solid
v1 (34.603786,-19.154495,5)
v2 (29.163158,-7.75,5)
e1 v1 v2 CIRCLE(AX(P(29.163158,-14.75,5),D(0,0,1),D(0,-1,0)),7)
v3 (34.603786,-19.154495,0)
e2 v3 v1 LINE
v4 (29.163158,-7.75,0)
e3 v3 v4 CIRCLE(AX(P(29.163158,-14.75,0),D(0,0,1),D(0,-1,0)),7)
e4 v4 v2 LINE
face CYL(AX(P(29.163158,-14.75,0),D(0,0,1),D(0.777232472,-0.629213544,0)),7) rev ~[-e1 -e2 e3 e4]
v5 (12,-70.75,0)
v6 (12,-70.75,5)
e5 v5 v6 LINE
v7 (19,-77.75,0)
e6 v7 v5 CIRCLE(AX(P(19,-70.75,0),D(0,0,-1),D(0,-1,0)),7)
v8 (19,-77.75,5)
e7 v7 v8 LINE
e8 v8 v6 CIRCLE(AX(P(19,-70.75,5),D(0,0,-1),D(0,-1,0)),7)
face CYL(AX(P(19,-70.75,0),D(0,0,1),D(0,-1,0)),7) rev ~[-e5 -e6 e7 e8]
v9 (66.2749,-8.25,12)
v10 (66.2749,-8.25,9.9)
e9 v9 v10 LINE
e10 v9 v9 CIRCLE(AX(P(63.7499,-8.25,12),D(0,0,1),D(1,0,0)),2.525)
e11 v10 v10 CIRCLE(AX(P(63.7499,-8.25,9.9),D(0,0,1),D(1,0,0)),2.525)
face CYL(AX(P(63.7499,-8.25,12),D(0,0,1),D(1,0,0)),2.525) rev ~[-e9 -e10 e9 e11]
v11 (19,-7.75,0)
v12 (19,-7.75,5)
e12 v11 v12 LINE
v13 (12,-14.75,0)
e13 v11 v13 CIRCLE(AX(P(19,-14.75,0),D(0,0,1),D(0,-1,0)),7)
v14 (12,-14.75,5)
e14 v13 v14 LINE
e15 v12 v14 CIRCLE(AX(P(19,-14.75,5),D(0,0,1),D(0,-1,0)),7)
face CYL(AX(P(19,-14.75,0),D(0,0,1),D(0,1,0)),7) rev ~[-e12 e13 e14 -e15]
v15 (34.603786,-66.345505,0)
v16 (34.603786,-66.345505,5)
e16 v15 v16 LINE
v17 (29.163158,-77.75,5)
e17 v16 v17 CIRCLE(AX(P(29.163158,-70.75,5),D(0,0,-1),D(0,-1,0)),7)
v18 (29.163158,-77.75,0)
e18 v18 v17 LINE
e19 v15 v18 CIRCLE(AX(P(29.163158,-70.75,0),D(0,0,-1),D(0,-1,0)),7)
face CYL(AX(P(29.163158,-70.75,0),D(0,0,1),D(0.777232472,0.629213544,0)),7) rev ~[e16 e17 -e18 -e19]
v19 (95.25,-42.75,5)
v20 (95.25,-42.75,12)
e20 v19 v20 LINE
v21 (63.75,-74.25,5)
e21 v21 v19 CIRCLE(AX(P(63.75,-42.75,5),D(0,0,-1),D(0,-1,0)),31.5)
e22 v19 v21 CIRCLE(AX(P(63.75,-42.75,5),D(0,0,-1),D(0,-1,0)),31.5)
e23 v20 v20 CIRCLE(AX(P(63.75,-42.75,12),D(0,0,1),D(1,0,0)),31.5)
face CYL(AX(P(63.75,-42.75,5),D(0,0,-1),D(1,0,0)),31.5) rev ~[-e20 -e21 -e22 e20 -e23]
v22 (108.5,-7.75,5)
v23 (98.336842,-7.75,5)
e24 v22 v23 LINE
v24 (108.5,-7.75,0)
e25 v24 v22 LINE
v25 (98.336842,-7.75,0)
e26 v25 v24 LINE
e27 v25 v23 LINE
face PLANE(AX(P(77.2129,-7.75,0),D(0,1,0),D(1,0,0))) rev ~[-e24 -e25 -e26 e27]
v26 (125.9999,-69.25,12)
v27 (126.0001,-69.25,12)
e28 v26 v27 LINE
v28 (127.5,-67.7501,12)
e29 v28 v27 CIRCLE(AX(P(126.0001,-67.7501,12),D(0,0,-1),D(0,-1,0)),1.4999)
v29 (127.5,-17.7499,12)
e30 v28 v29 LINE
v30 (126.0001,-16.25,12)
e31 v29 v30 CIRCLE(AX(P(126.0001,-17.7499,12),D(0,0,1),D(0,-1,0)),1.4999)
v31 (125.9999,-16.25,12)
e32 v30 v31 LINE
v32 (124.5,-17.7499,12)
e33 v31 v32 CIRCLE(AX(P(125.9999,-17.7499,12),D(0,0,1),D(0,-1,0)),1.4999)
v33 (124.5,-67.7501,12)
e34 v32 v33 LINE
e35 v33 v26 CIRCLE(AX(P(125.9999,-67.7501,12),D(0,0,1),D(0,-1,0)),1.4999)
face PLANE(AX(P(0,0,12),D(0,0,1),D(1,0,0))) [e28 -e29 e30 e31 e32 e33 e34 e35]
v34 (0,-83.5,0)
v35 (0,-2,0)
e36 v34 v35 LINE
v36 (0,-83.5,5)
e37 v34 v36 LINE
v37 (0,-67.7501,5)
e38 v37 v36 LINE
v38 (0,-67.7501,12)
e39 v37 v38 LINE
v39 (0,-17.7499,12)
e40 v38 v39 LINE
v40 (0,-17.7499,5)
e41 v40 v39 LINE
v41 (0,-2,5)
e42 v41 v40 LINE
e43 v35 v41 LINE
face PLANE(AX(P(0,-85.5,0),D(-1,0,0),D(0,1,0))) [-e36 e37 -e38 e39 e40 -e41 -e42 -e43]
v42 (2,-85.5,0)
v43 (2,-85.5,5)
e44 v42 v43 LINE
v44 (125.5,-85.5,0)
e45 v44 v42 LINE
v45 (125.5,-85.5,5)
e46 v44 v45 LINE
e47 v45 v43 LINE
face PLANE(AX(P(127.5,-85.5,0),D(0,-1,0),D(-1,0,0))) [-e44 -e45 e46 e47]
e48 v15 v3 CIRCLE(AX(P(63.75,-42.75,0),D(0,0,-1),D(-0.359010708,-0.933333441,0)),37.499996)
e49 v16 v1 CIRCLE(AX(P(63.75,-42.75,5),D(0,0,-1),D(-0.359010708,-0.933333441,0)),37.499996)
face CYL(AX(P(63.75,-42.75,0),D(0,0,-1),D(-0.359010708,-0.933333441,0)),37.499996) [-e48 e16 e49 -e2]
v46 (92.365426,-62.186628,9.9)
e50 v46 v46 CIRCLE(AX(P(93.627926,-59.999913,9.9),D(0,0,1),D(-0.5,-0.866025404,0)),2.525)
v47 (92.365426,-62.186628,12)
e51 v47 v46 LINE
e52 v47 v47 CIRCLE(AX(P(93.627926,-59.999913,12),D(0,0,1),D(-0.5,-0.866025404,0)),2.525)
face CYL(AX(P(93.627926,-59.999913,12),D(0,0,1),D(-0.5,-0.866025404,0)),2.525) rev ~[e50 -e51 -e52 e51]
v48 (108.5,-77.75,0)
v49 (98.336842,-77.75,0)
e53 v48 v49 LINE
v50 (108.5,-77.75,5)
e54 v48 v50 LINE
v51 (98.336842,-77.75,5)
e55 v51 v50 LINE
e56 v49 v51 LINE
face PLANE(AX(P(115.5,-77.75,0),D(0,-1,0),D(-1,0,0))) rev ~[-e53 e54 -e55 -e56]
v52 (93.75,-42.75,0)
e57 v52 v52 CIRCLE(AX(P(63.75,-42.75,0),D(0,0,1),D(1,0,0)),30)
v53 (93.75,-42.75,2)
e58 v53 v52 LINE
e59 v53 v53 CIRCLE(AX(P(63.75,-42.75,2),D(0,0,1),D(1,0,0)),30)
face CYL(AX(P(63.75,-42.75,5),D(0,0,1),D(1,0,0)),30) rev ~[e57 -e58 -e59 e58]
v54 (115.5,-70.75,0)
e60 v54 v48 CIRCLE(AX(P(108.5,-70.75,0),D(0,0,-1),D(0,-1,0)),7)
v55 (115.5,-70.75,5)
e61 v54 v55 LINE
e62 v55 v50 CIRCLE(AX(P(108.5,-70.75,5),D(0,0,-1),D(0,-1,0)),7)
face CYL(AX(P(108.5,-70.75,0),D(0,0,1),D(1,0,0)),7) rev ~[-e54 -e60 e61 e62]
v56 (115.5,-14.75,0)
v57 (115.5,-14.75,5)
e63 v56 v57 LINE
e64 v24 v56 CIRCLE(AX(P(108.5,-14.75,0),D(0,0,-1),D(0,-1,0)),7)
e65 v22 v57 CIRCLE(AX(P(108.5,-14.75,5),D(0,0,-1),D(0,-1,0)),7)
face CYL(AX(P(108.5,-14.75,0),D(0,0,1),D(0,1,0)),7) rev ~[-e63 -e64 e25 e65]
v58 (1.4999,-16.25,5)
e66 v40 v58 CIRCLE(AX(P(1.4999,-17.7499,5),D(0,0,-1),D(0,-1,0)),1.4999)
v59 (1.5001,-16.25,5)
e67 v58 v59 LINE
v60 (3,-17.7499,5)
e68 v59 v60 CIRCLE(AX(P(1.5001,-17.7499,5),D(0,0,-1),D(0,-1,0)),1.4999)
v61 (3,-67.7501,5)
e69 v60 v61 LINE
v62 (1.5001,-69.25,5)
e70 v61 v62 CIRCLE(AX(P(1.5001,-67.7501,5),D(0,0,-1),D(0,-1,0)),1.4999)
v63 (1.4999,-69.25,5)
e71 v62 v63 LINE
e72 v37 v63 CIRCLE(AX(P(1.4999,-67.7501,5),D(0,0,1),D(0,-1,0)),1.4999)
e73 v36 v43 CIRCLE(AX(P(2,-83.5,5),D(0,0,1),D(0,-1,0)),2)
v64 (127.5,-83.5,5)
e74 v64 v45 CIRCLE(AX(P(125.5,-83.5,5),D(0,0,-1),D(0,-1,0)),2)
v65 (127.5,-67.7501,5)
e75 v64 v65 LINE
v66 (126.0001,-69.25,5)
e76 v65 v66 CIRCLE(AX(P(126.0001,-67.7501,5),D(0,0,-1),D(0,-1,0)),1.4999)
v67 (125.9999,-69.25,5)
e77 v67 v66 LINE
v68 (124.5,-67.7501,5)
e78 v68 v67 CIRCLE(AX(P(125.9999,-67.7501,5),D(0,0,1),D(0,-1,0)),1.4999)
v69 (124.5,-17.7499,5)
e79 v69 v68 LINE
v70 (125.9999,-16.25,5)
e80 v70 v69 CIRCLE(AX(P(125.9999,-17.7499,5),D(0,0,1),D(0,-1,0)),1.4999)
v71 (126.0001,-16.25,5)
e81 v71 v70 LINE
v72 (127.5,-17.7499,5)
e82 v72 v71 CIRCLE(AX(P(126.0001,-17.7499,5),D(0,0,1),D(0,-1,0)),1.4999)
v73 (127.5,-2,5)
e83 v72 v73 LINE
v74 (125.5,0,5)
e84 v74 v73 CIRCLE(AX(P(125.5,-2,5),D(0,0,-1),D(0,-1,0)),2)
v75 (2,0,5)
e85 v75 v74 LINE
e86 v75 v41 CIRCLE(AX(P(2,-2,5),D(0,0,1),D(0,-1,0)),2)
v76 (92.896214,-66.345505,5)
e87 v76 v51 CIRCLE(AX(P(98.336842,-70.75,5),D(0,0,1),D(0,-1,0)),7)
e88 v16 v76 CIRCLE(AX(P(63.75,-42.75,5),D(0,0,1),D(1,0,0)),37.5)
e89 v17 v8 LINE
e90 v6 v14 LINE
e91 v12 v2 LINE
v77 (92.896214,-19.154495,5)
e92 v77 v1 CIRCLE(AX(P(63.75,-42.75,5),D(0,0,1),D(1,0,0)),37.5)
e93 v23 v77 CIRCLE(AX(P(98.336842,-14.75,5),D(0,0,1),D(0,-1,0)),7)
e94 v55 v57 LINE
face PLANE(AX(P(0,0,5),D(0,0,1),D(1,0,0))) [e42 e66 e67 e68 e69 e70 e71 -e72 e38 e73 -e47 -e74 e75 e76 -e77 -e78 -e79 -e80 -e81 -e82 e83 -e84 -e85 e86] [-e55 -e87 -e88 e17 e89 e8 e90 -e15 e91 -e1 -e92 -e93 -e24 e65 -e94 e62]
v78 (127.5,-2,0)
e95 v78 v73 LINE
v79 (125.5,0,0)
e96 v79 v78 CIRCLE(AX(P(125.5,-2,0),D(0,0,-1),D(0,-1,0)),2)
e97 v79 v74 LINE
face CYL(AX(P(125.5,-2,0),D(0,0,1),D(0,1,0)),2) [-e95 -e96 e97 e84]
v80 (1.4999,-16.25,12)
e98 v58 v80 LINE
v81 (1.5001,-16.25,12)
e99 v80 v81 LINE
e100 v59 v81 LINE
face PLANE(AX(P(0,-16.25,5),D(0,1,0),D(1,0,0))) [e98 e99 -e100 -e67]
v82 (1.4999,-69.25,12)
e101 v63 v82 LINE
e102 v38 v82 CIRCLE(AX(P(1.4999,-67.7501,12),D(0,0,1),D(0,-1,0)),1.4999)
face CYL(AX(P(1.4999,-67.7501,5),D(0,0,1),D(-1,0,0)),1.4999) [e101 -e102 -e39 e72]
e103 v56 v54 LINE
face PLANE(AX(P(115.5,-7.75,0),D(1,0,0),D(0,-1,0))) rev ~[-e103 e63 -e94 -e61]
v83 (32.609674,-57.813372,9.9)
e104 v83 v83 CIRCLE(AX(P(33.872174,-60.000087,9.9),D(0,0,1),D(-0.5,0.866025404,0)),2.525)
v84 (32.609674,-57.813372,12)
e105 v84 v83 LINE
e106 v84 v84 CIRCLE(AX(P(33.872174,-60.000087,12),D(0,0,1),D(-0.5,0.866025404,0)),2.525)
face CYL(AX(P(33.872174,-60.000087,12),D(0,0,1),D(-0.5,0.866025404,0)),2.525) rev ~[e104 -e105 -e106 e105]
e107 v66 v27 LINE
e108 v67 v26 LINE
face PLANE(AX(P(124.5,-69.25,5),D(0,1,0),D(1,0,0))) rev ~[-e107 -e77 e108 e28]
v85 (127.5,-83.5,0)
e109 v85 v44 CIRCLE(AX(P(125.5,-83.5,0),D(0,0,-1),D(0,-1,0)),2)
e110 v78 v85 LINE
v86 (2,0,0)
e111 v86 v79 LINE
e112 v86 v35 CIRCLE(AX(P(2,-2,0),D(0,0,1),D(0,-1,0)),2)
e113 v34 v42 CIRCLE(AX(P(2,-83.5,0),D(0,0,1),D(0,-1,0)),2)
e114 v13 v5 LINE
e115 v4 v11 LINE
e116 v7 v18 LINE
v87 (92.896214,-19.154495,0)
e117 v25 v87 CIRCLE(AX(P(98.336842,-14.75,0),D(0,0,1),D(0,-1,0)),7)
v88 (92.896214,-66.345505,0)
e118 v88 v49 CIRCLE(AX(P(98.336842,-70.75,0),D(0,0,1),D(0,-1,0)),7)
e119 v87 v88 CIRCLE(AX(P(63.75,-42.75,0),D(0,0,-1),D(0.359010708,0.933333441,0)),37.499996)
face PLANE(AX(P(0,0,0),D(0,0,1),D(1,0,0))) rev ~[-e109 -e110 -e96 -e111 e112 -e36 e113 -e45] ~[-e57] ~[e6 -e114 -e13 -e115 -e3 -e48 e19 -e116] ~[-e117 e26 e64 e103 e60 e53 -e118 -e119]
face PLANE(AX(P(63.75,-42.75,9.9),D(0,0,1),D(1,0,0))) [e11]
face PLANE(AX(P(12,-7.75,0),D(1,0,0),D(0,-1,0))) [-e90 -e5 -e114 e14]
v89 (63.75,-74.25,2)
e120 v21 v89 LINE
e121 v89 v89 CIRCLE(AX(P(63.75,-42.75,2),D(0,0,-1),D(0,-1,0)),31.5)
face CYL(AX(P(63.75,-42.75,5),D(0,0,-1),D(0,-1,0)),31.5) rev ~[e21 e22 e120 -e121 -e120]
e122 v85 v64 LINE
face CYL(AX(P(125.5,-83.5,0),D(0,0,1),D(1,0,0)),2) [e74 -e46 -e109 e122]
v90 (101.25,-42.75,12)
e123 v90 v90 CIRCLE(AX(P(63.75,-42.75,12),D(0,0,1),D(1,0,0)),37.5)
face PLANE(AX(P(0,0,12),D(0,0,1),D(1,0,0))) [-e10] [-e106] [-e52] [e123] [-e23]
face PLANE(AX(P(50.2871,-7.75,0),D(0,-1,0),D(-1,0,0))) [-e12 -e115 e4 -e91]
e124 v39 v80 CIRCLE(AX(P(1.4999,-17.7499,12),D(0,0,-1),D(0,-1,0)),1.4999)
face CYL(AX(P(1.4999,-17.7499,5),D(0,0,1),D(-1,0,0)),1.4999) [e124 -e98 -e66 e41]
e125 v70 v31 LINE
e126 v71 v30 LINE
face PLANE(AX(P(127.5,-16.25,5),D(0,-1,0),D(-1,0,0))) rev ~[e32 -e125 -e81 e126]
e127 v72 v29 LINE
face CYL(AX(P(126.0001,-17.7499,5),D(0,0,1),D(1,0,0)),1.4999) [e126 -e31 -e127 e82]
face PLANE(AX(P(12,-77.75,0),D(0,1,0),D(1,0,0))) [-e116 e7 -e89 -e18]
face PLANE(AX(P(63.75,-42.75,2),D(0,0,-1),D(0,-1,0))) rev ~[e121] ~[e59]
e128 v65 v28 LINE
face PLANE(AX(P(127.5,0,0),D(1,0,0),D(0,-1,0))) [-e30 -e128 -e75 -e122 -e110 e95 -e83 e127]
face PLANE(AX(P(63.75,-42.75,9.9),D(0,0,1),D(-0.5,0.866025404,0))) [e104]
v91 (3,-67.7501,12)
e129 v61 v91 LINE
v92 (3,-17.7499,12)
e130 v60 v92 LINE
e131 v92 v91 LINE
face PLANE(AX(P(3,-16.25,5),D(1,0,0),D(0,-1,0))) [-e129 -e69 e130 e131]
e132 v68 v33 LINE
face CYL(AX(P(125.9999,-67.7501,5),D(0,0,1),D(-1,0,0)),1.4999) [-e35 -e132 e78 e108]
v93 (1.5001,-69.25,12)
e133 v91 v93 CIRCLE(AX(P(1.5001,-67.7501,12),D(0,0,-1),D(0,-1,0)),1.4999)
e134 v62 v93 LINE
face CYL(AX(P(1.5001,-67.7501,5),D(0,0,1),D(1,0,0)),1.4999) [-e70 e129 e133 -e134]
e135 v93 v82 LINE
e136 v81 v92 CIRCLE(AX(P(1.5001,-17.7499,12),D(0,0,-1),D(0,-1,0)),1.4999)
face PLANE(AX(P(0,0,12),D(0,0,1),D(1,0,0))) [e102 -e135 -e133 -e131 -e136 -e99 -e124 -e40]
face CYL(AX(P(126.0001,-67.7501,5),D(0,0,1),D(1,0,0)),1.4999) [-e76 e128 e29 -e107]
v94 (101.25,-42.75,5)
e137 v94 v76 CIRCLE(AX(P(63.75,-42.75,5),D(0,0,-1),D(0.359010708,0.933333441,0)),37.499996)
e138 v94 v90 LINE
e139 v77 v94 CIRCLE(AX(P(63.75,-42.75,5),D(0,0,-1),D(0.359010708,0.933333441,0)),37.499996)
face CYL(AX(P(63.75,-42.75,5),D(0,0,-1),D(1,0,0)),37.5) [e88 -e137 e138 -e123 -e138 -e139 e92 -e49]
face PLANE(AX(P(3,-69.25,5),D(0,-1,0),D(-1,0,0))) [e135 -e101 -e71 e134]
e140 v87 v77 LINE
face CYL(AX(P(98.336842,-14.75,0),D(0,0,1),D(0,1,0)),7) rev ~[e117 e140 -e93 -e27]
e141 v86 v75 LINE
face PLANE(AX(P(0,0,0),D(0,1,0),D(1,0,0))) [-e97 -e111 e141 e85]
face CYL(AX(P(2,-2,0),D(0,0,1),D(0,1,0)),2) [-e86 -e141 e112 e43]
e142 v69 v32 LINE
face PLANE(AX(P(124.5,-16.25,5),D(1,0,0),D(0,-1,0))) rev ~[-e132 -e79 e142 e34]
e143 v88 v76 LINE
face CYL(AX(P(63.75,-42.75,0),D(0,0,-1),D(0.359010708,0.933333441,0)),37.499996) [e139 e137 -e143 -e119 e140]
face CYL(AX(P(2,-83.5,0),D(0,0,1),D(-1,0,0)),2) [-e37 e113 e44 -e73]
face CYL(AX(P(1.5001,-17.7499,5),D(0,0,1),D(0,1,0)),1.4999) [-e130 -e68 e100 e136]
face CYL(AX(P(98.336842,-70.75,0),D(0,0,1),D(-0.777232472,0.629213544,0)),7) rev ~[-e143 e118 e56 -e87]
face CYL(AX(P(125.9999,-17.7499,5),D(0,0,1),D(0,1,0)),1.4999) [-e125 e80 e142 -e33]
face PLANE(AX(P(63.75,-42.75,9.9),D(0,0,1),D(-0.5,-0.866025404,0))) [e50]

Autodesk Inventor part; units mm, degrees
ref_plane "YZ Plane" through (0, 0, 0) normal (1, 0, 0) x (0, 1, 0)
ref_plane "XZ Plane" through (0, 0, 0) normal (0, 1, 0) x (-1, 0, 0)
ref_plane "XY Plane" through (0, 0, 0) normal (0, 0, 1) x (1, 0, 0)
sketch "Skizze1" plane through (0, 0, 0) normal (0, 0, 1) x (1, 0, 0)
  line L0 (0, 0) -> (127.5, 0)
  line L1 (127.5, 0) -> (127.5, -85.5)
  line L2 (127.5, -85.5) -> (0, -85.5)
  line L3 (0, -85.5) -> (0, 0)
  dimension "d0" = 127.5
  dimension "d1" = 85.5
extrude "Extrusion1" add sketch "Skizze1" along normal blind 5
sketch "Skizze2" plane through (0, 0, 5) normal (0, 0, 1) x (1, 0, 0)
  line L0 (0, -16.25) -> (3, -16.25)
  line L1 (3, -16.25) -> (3, -69.25)
  line L2 (3, -69.25) -> (0, -69.25)
  line L3 (0, -69.25) -> (0, -16.25)
  line L4 (63.75, 42.9175) -> (63.75, -147.2432)
  line L5 (127.5, -85.5) -> (127.5, 0) projected
  line L6 (127.5, -16.25) -> (124.5, -16.25)
  line L7 (124.5, -16.25) -> (124.5, -69.25)
  line L8 (124.5, -69.25) -> (127.5, -69.25)
  line L9 (127.5, -69.25) -> (127.5, -16.25)
  point P0 (0, 0)
  dimension "d4" = 3
  dimension "d5" = 53
  dimension "d6" = 16.25
  dimension "d7" = 63.75
extrude "Extrusion2" add sketch "Skizze2" along normal blind 7
fillet "Rundung1" radius 2 4 edges at (0, 0, 2.5) (127.5, 0, 2.5) (127.5, -85.5, 2.5) (0, -85.5, 2.5)
fillet "Rundung2" radius 1.5 8 edges at (3, -69.25, 8.5) (0, -69.25, 8.5) (3, -16.25, 8.5) (0, -16.25, 8.5) (124.5, -16.25, 8.5) (127.5, -16.25, 8.5) (124.5, -69.25, 8.5) (127.5, -69.25, 8.5)
sketch "Skizze3" plane through (0, 0, 5) normal (0, 0, 1) x (1, 0, 0)
  circle A0 centre (63.75, -42.75) radius 30
  line L0 (0, -67.75) -> (0, -83.5) projected
  point P0 (0, 0)
  dimension "d12" = 60
  dimension "d13" = 63.75
  dimension "d14" = 42.75
extrude "Extrusion3" cut sketch "Skizze3" against normal blind 10
hole "Bohrung1" at (63.75, -42.75, 5) direction (0, 0, -1) diameter 63 depth 3
sketch "Skizze4" plane through (0, 0, 0) normal (0, 0, -1) x (-1, 0, 0)
  line L0 (-125.5, -85.5) -> (-2, -85.5) projected
  line L1 (0, -83.5) -> (0, -2) projected
  line L2 (-12, -77.75) -> (-50.2871, -77.75)
  line L3 (-50.2871, -7.75) -> (-12, -7.75)
  line L4 (-12, -7.75) -> (-12, -77.75)
  line L5 (-63.75, -42.75) -> (-63.75, -99.3052)
  line L6 (-115.5, -77.75) -> (-77.2129, -77.75)
  line L7 (-77.2129, -7.75) -> (-115.5, -7.75)
  line L8 (-115.5, -7.75) -> (-115.5, -77.75)
  arc A0 (-50.2871, -77.75) -> (-50.2871, -7.75) centre (-63.75, -42.75) ccw
  arc A1 (-77.2129, -7.75) -> (-77.2129, -77.75) centre (-63.75, -42.75) ccw
  arc A2 (-50.2871, -77.75) -> (-50.2871, -7.75) centre (-63.75, -42.75) ccw
  arc A3 (-77.2129, -7.75) -> (-77.2129, -77.75) centre (-63.75, -42.75) ccw
  point P0 (0, 0)
  dimension "d27" = 42.75
  dimension "d28" = 63.75
  dimension "d29" = 12
  dimension "d30" = 70
  dimension "d31" = 7.75
extrude "Extrusion4" cut sketch "Skizze4" against normal blind 10
fillet "Rundung3" radius 7 4 edges at (50.2871, -77.75, 2.5) (77.2129, -77.75, 2.5) (50.2871, -7.75, 2.5) (77.2129, -7.75, 2.5)
fillet "Rundung4" radius 7 4 edges at (12, -77.75, 2.5) (115.5, -77.75, 2.5) (12, -7.75, 2.5) (115.5, -7.75, 2.5)
sketch "Skizze5" plane through (0, 0, 5) normal (0, 0, 1) x (1, 0, 0)
  circle A0 centre (63.75, -42.75) radius 31.5
  circle A1 centre (63.75, -42.75) radius 37.5
  line L0 (125.5, 0) -> (2, 0) projected
  point P0 (0, 0)
  dimension "d36" = 63
  dimension "d37" = 75
  dimension "d38" = 42.75
  dimension "d39" = 63.75
extrude "Extrusion5" add sketch "Skizze5" along normal blind 7
sketch "Skizze6" plane through (63.75, -42.75, 12) normal (0, 0, 1) x (1, 0, 0)
  circle A0 centre (-0.0001, 34.5) radius 2.525
  circle A1 centre (0, 0) radius 31.5 projected
  point P0 (-63.75, 42.75)
  dimension "d42" = 5.05
  dimension "d43" = 34.5
extrude "Extrusion6" cut sketch "Skizze6" against normal blind 2.1 contours A0
pattern_circular "Runde Anordnung1" count 3 over 360 about axis through (63.75, -42.75, 3.5) along (0, 0, 1) of "Extrusion6"
properties part number "Sensor Halterung63"
